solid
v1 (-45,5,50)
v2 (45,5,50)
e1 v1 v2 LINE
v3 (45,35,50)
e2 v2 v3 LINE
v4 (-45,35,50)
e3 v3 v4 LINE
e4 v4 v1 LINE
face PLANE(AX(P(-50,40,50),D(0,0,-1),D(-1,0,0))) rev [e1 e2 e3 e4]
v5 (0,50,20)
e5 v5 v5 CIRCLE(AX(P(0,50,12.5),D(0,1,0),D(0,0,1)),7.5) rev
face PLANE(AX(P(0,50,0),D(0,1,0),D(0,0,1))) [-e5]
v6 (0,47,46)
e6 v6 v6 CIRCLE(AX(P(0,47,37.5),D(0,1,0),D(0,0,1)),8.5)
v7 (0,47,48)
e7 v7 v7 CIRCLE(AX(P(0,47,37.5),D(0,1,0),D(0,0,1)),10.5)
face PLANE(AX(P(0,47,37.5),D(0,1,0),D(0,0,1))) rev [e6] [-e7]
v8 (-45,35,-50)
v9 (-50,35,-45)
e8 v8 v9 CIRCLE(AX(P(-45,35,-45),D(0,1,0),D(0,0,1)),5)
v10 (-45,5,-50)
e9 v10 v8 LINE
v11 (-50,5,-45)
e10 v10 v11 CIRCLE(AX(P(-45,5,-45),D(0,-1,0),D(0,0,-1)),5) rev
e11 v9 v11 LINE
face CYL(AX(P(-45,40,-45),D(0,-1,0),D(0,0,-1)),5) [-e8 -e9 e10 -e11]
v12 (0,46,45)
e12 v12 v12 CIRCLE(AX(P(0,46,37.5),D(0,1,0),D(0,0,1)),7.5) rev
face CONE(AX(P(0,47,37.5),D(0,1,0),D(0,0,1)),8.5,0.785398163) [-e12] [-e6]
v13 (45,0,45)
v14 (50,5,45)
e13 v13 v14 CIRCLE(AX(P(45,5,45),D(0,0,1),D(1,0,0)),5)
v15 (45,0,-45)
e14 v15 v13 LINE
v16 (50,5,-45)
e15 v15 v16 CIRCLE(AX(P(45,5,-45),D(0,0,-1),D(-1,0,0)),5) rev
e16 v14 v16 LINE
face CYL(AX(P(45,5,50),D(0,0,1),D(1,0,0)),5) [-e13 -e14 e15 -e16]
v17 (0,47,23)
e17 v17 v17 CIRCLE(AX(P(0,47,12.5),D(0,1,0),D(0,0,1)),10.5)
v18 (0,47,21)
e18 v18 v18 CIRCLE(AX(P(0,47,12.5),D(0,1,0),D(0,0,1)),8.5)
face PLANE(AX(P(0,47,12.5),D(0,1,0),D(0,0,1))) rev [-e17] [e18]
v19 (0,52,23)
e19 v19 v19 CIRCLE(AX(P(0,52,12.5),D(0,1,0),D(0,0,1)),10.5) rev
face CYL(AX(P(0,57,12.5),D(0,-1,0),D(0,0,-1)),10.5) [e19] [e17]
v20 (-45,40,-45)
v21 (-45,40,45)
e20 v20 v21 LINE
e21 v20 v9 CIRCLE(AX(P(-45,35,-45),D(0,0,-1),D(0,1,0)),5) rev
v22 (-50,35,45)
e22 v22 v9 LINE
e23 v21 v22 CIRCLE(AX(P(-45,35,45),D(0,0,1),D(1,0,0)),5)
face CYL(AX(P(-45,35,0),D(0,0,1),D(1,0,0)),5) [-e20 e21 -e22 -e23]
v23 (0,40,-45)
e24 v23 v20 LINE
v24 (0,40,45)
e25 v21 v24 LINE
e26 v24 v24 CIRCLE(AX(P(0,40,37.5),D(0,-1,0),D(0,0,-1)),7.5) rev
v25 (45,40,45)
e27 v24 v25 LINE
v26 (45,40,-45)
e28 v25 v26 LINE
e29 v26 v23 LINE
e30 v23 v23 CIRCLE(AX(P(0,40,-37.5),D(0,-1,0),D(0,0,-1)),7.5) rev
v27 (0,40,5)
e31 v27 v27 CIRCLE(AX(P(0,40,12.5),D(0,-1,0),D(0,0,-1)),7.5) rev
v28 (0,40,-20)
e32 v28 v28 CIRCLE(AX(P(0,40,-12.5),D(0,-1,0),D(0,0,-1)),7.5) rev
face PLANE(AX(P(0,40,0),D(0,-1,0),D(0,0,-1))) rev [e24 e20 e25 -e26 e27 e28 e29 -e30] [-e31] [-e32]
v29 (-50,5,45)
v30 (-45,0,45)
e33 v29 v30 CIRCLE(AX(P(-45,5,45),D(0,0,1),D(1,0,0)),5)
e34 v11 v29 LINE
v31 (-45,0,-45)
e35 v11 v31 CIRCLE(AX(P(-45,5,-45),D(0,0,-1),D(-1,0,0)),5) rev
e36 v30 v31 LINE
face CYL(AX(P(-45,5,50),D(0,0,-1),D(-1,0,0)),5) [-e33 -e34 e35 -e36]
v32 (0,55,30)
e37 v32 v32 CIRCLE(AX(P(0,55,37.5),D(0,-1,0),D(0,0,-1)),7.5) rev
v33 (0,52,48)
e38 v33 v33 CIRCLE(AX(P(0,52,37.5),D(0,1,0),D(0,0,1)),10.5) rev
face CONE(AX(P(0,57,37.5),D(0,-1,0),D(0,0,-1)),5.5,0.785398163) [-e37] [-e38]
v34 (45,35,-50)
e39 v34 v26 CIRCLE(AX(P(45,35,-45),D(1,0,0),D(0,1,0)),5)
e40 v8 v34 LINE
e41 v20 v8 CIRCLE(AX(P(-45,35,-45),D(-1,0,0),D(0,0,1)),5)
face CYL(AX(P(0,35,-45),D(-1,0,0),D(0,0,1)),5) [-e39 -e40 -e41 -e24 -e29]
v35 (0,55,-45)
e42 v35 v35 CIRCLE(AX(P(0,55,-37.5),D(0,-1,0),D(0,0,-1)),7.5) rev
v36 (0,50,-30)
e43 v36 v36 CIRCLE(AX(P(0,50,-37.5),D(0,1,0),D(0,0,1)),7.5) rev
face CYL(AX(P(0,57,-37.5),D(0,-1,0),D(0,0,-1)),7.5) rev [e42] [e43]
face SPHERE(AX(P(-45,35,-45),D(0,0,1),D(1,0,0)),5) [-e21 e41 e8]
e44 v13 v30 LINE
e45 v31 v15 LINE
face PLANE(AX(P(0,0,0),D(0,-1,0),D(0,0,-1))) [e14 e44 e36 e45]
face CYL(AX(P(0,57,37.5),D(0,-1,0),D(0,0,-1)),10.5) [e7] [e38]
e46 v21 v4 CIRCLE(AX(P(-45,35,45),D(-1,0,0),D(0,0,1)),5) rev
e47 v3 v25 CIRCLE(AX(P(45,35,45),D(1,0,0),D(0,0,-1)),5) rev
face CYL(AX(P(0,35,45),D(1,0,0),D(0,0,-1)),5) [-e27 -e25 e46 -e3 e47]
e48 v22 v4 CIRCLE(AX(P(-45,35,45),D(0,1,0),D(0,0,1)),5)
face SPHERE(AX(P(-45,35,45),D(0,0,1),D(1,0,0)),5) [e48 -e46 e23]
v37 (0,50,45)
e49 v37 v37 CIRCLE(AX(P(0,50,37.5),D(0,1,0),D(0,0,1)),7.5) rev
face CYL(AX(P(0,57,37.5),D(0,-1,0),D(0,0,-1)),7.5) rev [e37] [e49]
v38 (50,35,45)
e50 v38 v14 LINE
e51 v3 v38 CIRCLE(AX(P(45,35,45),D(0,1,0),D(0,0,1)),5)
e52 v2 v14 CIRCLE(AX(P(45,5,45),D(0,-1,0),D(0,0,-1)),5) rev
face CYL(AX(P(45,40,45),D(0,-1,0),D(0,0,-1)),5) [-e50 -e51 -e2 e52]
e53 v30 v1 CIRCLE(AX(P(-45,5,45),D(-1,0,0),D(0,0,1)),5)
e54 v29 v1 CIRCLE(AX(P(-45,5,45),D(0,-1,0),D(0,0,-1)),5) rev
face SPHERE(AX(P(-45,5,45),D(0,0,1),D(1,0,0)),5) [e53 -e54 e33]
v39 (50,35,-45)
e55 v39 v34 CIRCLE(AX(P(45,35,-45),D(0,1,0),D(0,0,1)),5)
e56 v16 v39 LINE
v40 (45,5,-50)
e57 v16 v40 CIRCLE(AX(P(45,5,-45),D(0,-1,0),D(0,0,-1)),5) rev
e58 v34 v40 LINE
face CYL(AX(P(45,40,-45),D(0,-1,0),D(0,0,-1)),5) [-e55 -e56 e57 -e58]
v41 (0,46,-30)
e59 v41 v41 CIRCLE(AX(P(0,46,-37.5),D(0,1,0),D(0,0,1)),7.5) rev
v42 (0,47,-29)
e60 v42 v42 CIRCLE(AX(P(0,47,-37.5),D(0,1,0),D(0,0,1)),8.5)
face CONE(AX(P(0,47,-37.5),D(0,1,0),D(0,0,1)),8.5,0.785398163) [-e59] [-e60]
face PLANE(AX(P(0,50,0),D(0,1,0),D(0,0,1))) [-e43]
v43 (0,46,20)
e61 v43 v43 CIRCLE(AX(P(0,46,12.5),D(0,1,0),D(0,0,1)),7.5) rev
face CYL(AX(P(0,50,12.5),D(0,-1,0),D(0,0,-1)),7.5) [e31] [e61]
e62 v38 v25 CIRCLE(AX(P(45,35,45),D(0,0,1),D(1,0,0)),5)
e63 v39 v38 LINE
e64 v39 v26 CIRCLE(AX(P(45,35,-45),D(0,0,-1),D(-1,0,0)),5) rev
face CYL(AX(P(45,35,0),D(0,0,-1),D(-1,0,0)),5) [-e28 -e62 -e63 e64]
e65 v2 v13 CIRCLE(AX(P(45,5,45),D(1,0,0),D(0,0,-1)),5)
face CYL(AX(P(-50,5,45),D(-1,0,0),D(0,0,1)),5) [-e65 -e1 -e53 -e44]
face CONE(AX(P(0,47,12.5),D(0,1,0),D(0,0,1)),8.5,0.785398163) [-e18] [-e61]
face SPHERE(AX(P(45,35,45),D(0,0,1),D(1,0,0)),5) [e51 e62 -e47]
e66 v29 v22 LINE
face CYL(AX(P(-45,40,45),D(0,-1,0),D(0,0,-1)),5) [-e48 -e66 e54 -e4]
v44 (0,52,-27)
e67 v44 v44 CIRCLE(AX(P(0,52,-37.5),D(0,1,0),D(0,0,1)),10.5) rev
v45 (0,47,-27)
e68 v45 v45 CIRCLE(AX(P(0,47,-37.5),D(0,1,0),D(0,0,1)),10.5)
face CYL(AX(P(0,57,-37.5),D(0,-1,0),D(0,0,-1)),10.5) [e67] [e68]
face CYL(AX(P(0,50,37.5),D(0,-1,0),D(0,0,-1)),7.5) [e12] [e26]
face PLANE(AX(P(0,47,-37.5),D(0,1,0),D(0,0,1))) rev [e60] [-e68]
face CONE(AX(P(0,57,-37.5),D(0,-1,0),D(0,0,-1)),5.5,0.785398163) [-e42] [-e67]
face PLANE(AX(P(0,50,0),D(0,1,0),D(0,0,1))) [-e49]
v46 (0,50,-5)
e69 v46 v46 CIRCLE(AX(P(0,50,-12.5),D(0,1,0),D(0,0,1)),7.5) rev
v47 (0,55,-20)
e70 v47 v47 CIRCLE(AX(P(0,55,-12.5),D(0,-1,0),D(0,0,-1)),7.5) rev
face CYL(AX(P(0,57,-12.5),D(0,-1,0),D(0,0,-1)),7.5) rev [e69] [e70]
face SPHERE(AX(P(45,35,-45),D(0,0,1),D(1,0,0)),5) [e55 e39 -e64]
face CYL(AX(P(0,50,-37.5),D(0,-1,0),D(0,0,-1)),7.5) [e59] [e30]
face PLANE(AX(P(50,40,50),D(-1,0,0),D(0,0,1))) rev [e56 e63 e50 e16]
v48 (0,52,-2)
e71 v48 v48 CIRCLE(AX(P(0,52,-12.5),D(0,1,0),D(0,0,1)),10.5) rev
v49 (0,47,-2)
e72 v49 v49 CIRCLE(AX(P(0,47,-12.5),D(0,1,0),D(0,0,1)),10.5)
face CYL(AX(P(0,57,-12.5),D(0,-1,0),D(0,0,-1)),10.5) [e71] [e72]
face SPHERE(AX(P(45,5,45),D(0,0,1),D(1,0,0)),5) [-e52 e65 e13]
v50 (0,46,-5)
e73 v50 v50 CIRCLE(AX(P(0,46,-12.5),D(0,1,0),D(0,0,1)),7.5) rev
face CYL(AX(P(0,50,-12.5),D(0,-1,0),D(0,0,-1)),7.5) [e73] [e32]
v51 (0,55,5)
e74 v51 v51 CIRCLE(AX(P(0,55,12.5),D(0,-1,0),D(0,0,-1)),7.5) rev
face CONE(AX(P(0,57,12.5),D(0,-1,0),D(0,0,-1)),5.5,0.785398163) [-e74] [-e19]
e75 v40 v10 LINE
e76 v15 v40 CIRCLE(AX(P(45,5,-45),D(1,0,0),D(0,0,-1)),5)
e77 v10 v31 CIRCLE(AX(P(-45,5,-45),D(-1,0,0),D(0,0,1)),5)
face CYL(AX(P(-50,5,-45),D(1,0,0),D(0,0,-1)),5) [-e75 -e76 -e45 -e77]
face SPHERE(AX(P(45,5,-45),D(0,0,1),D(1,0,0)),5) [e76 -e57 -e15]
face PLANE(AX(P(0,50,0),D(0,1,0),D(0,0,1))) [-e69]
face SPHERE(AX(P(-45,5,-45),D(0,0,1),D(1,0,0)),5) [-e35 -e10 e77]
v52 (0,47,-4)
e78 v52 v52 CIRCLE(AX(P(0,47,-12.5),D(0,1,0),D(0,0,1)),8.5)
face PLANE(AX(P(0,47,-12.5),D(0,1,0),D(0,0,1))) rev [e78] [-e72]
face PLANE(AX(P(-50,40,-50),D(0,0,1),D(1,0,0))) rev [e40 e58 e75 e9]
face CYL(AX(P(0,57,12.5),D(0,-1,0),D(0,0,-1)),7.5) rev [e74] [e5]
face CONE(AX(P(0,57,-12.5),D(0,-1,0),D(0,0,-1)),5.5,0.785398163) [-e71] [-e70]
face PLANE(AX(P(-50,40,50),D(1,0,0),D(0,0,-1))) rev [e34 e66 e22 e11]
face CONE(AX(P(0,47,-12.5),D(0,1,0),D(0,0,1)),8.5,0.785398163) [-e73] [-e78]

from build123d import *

# Parameters (mm, degrees)
SKETCH1_W           = 100
SKETCH1_H           = 100
BOSS_EXTRUDE1_DEPTH = 40
SKETCH2_R           = 7.5
BOSS_EXTRUDE2_DEPTH = 10
BOSS_EXTRUDE3_START = 7
SKETCH2_4_R         = 10.5
SKETCH2_4_R_2       = 7.5
BOSS_EXTRUDE3_DEPTH = 10
CHAMFER1_SIZE       = 1
CHAMFER2_SIZE       = 5
FILLET1_R           = 5


# Some blends are built 0.0001 mm under size
with BuildPart() as part:
    # Sketch1 → Boss-Extrude1 (new body)
    with BuildSketch(Plane(origin=(0, 0, 0), x_dir=(1, 0, 0), z_dir=(0, 1, 0))):
        Rectangle(SKETCH1_W, SKETCH1_H)
    extrude(amount=BOSS_EXTRUDE1_DEPTH)

    # Sketch2 → Boss-Extrude2 (add)
    with BuildSketch(Plane(origin=(0, 40, 0), x_dir=(1, 0, 0), z_dir=(0, 1, 0))):
        with Locations(Location((0, -37.5, 0), (0, 0, 90))):
            Circle(SKETCH2_R)
        with Locations(Location((0, -12.5, 0), (0, 0, 90))):
            Circle(SKETCH2_R)
        with Locations(Location((0, 12.5, 0), (0, 0, 90))):
            Circle(SKETCH2_R)
        with Locations(Location((0, 37.5, 0), (0, 0, 90))):
            Circle(SKETCH2_R)
    extrude(amount=BOSS_EXTRUDE2_DEPTH)

    # Sketch2<4> → Boss-Extrude3 (add)
    # profile 1 of 4: a face of its own
    with BuildSketch(Plane(origin=(0, 40, 0), x_dir=(1, 0, 0), z_dir=(0, 1, 0)).offset(BOSS_EXTRUDE3_START)):
        with Locations(Location((0, -37.5, 0), (0, 0, 270))):
            Circle(SKETCH2_4_R)
        with Locations(Location((0, -37.5, 0), (0, 0, 90))):
            Circle(SKETCH2_4_R_2, mode=Mode.SUBTRACT)
    # profile 2 of 4: a face of its own
    with BuildSketch(Plane(origin=(0, 40, 0), x_dir=(1, 0, 0), z_dir=(0, 1, 0)).offset(BOSS_EXTRUDE3_START)):
        with Locations(Location((0, -12.5, 0), (0, 0, 270))):
            Circle(SKETCH2_4_R)
        with Locations(Location((0, -12.5, 0), (0, 0, 90))):
            Circle(SKETCH2_4_R_2, mode=Mode.SUBTRACT)
    # profile 3 of 4: a face of its own
    with BuildSketch(Plane(origin=(0, 40, 0), x_dir=(1, 0, 0), z_dir=(0, 1, 0)).offset(BOSS_EXTRUDE3_START)):
        with Locations(Location((0, 12.5, 0), (0, 0, 270))):
            Circle(SKETCH2_4_R)
        with Locations(Location((0, 12.5, 0), (0, 0, 90))):
            Circle(SKETCH2_4_R_2, mode=Mode.SUBTRACT)
    # profile 4 of 4: a face of its own
    with BuildSketch(Plane(origin=(0, 40, 0), x_dir=(1, 0, 0), z_dir=(0, 1, 0)).offset(BOSS_EXTRUDE3_START)):
        with Locations(Location((0, 37.5, 0), (0, 0, 270))):
            Circle(SKETCH2_4_R)
        with Locations(Location((0, 37.5, 0), (0, 0, 90))):
            Circle(SKETCH2_4_R_2, mode=Mode.SUBTRACT)
    extrude(amount=BOSS_EXTRUDE3_DEPTH)

    # Chamfer1
    chamfer1_edges = [part.edges().sort_by_distance(p)[0] for p in [
        (0, 47, 45),
        (0, 47, 20),
        (0, 47, -5),
        (0, 47, -30),
    ]]
    chamfer(chamfer1_edges, length=CHAMFER1_SIZE)

    # Chamfer2
    # the kernel refuses this chamfer: 5 mm, written as the material it takes off along each edge
    with BuildSketch(Plane(origin=(0, 57, -37.5), x_dir=(0, 0, 1), z_dir=(-1, 0, 0))) as chamfer2_piece_1:
        Polygon((10.5, -CHAMFER2_SIZE), (10.5 - CHAMFER2_SIZE, 0), (10.5, 0), align=None)
    revolve(axis=Axis((0, 57, -37.5), (0, 1, 0)), mode=Mode.SUBTRACT)
    with BuildSketch(Plane(origin=(0, 57, -12.5), x_dir=(0, 0, 1), z_dir=(-1, 0, 0))) as chamfer2_piece_2:
        Polygon((10.5, -CHAMFER2_SIZE), (10.5 - CHAMFER2_SIZE, 0), (10.5, 0), align=None)
    revolve(axis=Axis((0, 57, -12.5), (0, 1, 0)), mode=Mode.SUBTRACT)
    with BuildSketch(Plane(origin=(0, 57, 12.5), x_dir=(0, 0, 1), z_dir=(-1, 0, 0))) as chamfer2_piece_3:
        Polygon((10.5, -CHAMFER2_SIZE), (10.5 - CHAMFER2_SIZE, 0), (10.5, 0), align=None)
    revolve(axis=Axis((0, 57, 12.5), (0, 1, 0)), mode=Mode.SUBTRACT)
    with BuildSketch(Plane(origin=(0, 57, 37.5), x_dir=(0, 0, 1), z_dir=(-1, 0, 0))) as chamfer2_piece_4:
        Polygon((10.5, -CHAMFER2_SIZE), (10.5 - CHAMFER2_SIZE, 0), (10.5, 0), align=None)
    revolve(axis=Axis((0, 57, 37.5), (0, 1, 0)), mode=Mode.SUBTRACT)

    # Fillet1
    fillet1_edges = [part.edges().sort_by_distance(p)[0] for p in [
        (-50, 40, 0),
        (0, 40, 50),
        (50, 40, 0),
        (0, 0, 50),
        (-50, 0, 0),
        (0, 0, -50),
        (50, 0, 0),
        (50, 20, 50),
        (-50, 20, 50),
        (-50, 20, -50),
        (50, 20, -50),
        (0, 40, -50),
    ]]
    fillet(fillet1_edges, radius=FILLET1_R - 0.0001)  # a hair under: the kernel refuses the full size


solid = part.part
